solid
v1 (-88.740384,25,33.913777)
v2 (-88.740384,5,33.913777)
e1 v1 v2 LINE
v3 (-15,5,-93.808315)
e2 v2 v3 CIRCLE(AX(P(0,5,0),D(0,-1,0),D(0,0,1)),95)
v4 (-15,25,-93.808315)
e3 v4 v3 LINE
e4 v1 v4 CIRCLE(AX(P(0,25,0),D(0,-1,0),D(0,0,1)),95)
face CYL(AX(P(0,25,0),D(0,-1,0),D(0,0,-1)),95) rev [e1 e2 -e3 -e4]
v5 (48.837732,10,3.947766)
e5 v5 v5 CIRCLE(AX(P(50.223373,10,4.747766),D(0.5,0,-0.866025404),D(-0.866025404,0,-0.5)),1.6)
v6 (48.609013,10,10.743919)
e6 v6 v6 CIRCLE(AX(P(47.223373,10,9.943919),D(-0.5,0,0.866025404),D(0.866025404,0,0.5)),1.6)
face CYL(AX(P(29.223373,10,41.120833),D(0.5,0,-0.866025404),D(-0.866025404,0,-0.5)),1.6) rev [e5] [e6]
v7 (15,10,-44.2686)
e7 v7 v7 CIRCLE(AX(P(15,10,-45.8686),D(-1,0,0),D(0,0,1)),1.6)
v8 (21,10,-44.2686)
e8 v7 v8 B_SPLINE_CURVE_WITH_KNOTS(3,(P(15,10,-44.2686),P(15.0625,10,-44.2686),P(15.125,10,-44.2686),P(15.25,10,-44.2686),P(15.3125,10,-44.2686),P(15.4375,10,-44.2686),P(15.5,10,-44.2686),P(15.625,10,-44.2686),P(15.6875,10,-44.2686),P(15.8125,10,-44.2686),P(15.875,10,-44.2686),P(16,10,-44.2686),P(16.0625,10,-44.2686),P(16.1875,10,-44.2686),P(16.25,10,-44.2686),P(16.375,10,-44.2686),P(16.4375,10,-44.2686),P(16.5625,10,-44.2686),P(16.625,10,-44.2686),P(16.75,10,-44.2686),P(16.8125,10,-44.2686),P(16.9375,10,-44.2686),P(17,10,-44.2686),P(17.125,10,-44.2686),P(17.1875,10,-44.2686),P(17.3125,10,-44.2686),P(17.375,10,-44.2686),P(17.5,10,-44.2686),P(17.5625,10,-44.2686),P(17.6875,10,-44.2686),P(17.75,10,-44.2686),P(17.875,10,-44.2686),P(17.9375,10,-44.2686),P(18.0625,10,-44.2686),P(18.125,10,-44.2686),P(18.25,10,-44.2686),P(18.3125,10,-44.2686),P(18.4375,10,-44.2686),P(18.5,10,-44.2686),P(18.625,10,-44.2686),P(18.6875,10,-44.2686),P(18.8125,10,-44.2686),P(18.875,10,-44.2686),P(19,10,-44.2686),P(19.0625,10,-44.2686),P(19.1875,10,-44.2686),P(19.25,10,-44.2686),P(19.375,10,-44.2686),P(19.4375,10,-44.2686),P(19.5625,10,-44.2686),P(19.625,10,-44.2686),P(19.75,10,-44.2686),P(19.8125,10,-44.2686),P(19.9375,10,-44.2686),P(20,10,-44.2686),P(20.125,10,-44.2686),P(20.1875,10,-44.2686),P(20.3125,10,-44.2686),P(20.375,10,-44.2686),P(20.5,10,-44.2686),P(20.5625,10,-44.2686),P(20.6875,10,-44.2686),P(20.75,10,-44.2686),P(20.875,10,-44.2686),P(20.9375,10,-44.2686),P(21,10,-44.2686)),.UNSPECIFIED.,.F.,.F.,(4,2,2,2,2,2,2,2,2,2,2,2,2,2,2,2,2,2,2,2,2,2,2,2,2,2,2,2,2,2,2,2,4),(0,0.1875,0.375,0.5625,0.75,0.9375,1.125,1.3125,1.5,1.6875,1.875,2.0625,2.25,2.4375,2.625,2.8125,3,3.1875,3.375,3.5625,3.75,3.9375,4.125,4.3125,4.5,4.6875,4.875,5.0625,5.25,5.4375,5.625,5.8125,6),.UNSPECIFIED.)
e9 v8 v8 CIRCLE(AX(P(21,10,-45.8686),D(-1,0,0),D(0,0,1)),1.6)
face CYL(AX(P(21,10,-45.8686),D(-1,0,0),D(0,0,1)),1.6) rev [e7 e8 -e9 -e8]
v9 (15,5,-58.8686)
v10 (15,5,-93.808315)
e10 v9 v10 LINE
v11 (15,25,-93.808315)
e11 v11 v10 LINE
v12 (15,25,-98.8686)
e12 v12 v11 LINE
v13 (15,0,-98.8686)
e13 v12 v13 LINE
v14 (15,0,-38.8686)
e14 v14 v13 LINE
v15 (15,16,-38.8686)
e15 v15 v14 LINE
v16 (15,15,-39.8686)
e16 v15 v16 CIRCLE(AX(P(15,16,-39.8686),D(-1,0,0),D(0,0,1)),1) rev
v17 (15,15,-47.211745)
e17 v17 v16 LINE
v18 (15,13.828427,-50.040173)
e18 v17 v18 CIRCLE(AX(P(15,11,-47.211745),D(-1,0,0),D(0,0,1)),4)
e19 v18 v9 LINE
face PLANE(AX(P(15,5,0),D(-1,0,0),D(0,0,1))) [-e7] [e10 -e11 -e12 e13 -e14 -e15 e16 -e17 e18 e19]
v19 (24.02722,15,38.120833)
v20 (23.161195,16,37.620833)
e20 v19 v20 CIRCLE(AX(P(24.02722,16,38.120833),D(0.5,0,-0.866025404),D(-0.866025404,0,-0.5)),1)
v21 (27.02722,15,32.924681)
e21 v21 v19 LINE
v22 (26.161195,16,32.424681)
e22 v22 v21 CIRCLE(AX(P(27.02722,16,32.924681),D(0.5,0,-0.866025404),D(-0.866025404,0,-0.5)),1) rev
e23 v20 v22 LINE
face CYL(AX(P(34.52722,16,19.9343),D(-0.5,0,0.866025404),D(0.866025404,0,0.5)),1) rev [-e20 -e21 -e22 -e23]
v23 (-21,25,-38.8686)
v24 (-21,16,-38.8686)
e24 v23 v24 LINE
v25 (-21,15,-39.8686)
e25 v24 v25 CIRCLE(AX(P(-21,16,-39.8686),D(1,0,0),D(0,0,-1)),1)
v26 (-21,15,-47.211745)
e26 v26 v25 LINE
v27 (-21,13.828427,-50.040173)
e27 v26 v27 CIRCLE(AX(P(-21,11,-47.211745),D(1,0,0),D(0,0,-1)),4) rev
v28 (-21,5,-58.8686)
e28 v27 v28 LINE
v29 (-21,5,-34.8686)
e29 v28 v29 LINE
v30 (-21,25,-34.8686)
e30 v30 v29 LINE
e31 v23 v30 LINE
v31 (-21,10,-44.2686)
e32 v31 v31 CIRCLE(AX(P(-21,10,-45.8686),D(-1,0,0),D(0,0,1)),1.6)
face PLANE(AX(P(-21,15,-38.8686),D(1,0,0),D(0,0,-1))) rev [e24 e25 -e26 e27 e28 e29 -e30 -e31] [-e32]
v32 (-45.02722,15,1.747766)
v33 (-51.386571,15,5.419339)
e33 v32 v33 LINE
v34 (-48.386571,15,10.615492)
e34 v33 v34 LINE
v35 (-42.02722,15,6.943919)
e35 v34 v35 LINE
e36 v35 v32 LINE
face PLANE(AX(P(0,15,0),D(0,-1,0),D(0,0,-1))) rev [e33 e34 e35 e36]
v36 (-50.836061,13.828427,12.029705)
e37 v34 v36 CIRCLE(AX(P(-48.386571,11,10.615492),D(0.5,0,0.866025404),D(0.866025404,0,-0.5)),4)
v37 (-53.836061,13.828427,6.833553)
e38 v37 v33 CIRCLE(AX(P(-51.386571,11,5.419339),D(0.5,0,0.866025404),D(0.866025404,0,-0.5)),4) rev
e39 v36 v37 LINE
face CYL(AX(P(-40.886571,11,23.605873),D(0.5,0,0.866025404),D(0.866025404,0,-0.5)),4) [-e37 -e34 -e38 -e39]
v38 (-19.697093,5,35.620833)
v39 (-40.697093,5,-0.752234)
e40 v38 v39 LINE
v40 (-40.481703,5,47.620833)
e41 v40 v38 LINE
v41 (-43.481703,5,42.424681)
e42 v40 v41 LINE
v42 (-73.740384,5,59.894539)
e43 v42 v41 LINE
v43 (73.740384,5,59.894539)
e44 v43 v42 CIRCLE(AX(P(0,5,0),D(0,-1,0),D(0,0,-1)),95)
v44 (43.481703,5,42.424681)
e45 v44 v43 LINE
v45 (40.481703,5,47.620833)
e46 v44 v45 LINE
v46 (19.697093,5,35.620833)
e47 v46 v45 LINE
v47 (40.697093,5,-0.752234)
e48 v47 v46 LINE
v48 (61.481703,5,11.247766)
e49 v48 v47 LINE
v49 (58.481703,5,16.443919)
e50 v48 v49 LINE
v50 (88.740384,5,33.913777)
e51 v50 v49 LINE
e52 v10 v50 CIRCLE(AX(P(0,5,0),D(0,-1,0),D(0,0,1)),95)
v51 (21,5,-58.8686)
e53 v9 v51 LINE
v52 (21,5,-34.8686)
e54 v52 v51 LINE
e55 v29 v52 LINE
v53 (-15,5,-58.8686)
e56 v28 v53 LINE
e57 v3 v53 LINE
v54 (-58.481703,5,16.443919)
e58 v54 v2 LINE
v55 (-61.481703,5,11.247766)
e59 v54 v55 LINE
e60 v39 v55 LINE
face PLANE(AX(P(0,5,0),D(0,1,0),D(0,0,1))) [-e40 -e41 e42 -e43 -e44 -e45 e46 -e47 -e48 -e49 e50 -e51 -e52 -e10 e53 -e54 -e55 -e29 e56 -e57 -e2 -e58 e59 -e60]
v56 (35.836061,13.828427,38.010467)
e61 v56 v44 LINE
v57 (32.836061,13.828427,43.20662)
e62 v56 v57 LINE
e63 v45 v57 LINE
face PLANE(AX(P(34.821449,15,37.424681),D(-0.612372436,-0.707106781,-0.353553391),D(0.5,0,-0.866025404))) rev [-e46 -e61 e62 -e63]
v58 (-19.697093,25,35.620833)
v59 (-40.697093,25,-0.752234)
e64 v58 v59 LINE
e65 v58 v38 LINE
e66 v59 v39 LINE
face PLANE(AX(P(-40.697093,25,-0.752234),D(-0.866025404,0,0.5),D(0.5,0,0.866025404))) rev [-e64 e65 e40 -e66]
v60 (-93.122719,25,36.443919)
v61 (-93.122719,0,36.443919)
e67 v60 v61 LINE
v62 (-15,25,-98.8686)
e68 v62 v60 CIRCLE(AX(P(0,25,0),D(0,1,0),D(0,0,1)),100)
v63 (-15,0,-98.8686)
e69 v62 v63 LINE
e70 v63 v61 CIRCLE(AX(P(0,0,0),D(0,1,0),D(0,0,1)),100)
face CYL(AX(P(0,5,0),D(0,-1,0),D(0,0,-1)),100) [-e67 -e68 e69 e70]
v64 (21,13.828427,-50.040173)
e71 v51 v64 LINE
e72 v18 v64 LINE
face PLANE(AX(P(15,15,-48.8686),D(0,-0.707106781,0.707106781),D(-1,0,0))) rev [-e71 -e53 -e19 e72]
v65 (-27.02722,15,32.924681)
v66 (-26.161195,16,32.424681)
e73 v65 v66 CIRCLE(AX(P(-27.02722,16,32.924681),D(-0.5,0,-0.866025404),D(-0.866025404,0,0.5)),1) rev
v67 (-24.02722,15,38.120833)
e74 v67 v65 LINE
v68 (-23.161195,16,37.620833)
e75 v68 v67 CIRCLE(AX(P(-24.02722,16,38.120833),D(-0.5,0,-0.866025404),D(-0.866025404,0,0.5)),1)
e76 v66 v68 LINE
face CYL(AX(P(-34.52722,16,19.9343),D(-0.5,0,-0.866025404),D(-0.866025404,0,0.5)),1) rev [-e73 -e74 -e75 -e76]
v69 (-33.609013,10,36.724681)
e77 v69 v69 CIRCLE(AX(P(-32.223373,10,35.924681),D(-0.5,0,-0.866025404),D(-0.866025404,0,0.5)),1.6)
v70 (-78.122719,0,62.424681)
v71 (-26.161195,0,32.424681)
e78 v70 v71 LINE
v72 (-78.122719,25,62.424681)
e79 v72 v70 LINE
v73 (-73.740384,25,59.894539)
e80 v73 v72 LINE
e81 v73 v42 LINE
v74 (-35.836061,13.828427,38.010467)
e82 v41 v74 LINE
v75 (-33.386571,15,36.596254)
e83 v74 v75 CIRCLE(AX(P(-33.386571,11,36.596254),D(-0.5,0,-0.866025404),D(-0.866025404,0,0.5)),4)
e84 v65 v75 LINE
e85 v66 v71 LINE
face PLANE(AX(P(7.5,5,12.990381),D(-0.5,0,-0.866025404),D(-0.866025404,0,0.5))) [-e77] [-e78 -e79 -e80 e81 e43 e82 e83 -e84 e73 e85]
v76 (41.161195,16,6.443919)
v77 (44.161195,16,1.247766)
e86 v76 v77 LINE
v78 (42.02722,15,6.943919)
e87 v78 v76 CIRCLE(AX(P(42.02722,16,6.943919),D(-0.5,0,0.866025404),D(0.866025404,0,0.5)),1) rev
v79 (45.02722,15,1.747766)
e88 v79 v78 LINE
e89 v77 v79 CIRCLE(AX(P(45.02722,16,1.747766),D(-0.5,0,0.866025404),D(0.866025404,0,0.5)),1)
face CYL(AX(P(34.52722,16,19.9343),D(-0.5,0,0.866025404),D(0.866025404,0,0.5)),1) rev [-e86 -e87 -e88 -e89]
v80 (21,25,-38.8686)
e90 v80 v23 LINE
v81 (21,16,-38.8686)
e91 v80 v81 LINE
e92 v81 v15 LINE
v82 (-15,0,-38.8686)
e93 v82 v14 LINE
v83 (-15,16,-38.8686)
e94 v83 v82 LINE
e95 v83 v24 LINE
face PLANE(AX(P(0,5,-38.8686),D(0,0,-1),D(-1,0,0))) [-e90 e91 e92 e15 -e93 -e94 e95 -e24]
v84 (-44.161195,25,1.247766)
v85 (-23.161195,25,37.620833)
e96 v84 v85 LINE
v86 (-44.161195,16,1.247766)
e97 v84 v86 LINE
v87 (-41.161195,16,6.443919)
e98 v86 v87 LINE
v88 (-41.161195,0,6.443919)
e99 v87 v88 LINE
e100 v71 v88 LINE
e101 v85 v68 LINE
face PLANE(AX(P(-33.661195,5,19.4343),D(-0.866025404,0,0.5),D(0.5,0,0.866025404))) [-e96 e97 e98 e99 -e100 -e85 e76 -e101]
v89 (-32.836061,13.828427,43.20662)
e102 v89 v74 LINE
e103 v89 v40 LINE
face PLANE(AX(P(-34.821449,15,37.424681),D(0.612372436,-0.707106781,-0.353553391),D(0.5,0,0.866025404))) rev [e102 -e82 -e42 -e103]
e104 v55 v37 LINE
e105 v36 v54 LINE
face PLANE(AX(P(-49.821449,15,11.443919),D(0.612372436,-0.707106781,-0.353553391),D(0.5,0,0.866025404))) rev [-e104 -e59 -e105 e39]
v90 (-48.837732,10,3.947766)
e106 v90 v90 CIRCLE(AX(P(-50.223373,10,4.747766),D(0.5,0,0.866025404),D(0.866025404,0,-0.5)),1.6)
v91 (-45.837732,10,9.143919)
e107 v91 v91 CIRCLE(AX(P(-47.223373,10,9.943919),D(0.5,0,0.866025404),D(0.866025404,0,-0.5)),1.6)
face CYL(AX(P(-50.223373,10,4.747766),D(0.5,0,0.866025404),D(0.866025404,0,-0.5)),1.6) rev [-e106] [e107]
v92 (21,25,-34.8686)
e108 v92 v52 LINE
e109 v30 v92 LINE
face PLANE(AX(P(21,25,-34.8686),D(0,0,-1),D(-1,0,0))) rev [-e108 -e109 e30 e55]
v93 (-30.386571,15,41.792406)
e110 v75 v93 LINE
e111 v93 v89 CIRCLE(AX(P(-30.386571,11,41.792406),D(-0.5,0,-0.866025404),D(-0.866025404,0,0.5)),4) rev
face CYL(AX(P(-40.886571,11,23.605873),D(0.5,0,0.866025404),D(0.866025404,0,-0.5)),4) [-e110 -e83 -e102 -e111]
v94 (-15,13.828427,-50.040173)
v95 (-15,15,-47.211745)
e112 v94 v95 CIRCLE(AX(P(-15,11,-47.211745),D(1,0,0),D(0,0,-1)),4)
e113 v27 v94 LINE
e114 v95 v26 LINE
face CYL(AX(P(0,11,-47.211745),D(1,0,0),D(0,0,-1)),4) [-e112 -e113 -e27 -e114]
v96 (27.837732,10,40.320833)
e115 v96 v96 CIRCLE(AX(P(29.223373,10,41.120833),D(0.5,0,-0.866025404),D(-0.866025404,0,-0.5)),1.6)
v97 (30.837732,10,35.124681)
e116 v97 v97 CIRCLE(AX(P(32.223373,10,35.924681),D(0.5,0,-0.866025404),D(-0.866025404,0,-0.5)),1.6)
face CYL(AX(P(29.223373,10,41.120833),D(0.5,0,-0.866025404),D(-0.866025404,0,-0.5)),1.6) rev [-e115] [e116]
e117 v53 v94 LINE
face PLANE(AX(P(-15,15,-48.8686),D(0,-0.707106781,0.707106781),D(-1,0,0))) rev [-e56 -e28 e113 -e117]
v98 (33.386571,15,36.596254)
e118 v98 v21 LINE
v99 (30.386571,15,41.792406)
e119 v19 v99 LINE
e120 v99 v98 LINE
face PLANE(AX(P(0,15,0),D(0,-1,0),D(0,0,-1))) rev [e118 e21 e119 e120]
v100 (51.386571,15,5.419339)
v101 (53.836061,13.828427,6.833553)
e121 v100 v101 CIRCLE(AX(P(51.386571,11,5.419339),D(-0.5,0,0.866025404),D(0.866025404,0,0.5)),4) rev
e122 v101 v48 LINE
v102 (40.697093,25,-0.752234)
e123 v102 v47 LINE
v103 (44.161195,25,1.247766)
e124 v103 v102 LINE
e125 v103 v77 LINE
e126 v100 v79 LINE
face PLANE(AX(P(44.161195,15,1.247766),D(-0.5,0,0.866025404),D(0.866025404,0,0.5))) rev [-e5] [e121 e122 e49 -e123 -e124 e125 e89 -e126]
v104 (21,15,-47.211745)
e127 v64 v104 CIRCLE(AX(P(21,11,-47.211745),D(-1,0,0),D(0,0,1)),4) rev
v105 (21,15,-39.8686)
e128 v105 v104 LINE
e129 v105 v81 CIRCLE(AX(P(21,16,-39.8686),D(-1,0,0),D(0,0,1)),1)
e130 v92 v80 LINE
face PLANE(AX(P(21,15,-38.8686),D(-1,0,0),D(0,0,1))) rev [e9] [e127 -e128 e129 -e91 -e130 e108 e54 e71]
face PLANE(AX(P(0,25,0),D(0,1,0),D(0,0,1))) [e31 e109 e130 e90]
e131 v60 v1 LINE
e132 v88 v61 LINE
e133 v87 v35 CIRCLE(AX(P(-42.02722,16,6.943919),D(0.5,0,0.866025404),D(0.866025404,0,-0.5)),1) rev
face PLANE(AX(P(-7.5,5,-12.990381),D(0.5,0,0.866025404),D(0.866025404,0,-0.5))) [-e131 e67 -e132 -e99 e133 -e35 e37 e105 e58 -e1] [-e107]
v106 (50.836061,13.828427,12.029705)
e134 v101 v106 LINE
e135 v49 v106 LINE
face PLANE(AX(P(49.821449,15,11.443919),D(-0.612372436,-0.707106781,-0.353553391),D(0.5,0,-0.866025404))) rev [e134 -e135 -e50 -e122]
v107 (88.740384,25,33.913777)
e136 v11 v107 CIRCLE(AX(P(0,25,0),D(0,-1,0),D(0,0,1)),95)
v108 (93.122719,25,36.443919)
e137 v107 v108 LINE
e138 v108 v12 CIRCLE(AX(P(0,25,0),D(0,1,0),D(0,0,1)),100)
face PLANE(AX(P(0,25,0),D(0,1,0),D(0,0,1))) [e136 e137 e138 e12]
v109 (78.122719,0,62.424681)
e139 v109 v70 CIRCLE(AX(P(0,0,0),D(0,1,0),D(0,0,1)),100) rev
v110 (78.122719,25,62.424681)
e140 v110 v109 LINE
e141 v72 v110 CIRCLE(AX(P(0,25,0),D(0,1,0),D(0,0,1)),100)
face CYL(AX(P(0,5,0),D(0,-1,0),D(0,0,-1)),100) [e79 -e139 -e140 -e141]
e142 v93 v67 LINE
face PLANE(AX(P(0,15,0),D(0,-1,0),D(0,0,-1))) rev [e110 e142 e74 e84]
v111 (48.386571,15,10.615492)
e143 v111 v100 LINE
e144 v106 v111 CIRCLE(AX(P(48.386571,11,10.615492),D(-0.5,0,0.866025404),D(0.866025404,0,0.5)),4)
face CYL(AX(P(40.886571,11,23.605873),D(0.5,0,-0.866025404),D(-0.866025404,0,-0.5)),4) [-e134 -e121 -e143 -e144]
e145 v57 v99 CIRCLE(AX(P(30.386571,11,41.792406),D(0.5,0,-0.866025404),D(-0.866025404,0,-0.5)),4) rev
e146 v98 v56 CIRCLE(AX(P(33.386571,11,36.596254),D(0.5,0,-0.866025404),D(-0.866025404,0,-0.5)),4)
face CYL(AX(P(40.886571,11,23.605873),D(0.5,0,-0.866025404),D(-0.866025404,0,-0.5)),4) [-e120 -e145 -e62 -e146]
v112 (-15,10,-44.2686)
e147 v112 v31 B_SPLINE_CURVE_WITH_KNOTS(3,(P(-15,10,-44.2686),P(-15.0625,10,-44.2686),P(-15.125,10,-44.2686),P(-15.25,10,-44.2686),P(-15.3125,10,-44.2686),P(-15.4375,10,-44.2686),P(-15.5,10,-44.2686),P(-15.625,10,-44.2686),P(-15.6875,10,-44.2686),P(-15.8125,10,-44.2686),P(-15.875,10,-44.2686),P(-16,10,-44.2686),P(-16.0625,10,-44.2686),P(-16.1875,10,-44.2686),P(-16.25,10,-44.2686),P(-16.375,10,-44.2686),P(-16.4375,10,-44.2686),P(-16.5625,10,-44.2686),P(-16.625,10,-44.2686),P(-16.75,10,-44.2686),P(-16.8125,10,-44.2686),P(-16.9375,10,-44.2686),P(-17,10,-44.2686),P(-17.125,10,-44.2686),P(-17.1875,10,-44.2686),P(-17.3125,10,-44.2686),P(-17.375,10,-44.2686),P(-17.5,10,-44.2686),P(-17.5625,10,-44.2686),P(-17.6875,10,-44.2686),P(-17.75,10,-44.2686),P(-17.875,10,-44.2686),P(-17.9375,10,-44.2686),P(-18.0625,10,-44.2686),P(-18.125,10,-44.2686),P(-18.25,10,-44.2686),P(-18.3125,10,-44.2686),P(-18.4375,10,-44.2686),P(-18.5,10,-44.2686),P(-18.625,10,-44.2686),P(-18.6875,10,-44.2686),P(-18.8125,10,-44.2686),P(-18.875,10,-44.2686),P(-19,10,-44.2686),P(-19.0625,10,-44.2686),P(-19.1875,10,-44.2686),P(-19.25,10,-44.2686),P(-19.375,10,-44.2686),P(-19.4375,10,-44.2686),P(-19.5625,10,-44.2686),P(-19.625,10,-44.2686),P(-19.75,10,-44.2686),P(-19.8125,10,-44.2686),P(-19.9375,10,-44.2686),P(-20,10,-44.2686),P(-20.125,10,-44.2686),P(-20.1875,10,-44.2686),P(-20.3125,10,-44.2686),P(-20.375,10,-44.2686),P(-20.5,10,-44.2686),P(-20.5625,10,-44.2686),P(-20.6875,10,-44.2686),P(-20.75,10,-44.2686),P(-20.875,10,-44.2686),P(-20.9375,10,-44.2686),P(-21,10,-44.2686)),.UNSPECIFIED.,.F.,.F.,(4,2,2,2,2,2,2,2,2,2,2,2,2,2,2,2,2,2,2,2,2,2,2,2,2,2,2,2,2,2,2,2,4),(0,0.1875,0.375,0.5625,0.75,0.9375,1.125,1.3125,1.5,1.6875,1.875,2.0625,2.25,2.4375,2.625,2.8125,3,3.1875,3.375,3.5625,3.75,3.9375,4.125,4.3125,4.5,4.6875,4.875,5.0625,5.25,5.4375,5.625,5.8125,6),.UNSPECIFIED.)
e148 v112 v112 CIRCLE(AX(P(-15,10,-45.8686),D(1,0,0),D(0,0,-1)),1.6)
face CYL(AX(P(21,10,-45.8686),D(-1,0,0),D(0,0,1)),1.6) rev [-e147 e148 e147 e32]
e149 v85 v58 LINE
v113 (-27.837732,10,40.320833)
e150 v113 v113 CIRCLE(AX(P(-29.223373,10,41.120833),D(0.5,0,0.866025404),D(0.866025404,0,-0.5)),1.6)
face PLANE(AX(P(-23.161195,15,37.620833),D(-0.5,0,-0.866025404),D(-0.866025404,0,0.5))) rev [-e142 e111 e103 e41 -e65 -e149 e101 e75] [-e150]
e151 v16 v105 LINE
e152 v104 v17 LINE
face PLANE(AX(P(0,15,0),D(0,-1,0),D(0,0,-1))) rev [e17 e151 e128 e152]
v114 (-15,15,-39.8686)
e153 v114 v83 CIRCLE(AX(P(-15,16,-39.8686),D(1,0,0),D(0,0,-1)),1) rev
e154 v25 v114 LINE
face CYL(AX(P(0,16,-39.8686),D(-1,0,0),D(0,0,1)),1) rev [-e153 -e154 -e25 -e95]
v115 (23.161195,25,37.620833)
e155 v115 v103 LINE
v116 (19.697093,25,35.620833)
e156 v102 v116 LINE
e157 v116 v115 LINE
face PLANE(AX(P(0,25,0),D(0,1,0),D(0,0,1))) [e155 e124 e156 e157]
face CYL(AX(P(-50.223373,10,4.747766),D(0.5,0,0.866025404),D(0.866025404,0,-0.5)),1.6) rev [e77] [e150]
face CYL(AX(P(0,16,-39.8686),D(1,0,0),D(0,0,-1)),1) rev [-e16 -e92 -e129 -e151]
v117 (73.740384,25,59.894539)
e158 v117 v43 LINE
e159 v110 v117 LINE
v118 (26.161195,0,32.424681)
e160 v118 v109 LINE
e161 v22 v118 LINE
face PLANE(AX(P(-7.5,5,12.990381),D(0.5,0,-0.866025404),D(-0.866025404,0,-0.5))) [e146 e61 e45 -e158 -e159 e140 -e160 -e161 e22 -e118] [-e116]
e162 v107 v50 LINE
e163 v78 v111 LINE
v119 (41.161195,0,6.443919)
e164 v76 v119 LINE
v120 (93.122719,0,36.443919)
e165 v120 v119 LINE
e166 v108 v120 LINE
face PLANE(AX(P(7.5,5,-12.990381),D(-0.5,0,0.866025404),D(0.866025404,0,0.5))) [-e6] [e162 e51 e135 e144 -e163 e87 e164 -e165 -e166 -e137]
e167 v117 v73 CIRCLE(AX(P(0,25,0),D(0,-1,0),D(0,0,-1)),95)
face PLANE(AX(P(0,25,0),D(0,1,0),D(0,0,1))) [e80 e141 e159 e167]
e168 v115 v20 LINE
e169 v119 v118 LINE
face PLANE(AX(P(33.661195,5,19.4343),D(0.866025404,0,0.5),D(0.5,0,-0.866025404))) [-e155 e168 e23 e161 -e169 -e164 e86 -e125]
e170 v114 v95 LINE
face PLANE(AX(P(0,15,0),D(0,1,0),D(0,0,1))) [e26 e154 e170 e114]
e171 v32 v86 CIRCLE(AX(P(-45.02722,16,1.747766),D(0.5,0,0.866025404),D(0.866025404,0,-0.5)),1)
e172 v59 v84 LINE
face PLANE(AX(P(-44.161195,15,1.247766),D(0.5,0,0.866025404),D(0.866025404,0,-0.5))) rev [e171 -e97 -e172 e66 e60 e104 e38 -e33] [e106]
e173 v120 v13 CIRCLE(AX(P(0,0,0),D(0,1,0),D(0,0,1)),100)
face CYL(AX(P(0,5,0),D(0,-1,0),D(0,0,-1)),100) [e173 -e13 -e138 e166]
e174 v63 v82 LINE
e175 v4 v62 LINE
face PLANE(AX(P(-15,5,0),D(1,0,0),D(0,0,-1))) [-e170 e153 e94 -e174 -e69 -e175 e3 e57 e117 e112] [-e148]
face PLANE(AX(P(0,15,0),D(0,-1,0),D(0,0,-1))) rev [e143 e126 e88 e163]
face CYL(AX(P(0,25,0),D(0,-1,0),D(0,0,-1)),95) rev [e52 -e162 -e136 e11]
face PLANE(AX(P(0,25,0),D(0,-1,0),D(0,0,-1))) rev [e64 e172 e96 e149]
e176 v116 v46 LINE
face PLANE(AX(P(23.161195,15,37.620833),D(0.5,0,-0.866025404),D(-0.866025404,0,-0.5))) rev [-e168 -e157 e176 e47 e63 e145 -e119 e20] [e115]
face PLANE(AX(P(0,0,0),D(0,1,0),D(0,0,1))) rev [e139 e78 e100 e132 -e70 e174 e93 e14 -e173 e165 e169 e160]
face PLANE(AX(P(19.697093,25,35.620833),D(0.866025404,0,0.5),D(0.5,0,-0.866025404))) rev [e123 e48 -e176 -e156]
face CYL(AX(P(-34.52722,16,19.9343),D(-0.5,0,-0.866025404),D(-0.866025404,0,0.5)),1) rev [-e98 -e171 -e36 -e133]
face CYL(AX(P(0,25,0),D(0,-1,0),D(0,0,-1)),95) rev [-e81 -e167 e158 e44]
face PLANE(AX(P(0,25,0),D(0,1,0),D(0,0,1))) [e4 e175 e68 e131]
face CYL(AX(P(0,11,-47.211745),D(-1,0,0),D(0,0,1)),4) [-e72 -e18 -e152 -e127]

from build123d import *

# Parameters (mm, degrees)
AUFSATZ_LINEAR_AUSTRAGEN1_DEPTH = 5
SKIZZE2_W                       = 6
SKIZZE2_H                       = 10
AUFSATZ_LINEAR_AUSTRAGEN2_DEPTH = 10
FASE1_SIZE                      = 10
SKIZZE3_R                       = 1.6
SCHNITT_LINEAR_AUSTRAGEN1_DEPTH = 42
SKIZZE4_W                       = 42
SKIZZE4_H                       = 4
AUFSATZ_LINEAR_AUSTRAGEN3_DEPTH = 20
KREISMUSTER1_COUNT              = 3
VERRUNDUNG1_START               = -21
VERRUNDUNG1_DEPTH               = 6
VERRUNDUNG1_START_2             = 15
VERRUNDUNG1_2_DEPTH             = 6
VERRUNDUNG1_3_DEPTH             = 6
VERRUNDUNG1_4_DEPTH             = 6
VERRUNDUNG1_5_DEPTH             = 6
VERRUNDUNG1_6_DEPTH             = 6
VERRUNDUNG1_START_3             = -22
VERRUNDUNG1_7_DEPTH             = 44
VERRUNDUNG1_8_DEPTH             = 44
VERRUNDUNG1_9_DEPTH             = 44


with BuildPart() as part:
    # Skizze1 → Aufsatz-Linear austragen1 (new body)
    with BuildSketch(Plane(origin=(0, 0, 0), x_dir=(1, 0, 0), z_dir=(0, 1, 0))):
        with BuildLine():
            Line((93.122718948, -36.443918776), (41.161194721, -6.443918776))
            Line((41.161194721, -6.443918776), (26.161194721, -32.42468089))
            Line((26.161194721, -32.42468089), (78.122718948, -62.42468089))
            ThreePointArc((78.122718948, -62.42468089), (0, -100), (-78.122718948, -62.42468089))
            Line((-78.122718948, -62.42468089), (-26.161194721, -32.42468089))
            Line((-26.161194721, -32.42468089), (-41.161194721, -6.443918776))
            Line((-41.161194721, -6.443918776), (-93.122718948, -36.443918776))
            ThreePointArc((-93.122718948, -36.443918776), (-86.602540378, 50), (-15, 98.868599666))
            Line((-15, 98.868599666), (-15, 38.868599666))
            Line((-15, 38.868599666), (15, 38.868599666))
            Line((15, 38.868599666), (15, 98.868599666))
            ThreePointArc((15, 98.868599666), (86.602540378, 50), (93.122718948, -36.443918776))
        make_face()
    extrude(amount=AUFSATZ_LINEAR_AUSTRAGEN1_DEPTH)

    # Skizze2 → Aufsatz-Linear austragen2 (add)
    with BuildSketch(Plane(origin=(0, 5, 0), x_dir=(1, 0, 0), z_dir=(0, 1, 0))):
        Polygon((49.821448758, -11.443918776), (52.821448758, -6.247766354), (44.161194721, -1.247766354), (41.161194721, -6.443918776), align=None)
        with Locations((-18, 43.868599666)):
            Rectangle(SKIZZE2_W, SKIZZE2_H)
        with Locations((18, 43.868599666)):
            Rectangle(SKIZZE2_W, SKIZZE2_H)
        Polygon((26.161194721, -32.42468089), (23.161194721, -37.620833313), (31.821448758, -42.620833313), (34.821448758, -37.42468089), align=None)
        Polygon((-34.821448758, -37.42468089), (-31.821448758, -42.620833313), (-23.161194721, -37.620833313), (-26.161194721, -32.42468089), align=None)
        Polygon((-41.161194721, -6.443918776), (-44.161194721, -1.247766354), (-52.821448758, -6.247766354), (-49.821448758, -11.443918776), align=None)
    extrude(amount=AUFSATZ_LINEAR_AUSTRAGEN2_DEPTH)

    # Fase1
    fase1_edges = [part.edges().sort_by_distance(p)[0] for p in [
        (-18, 5, -48.868599666),
        (18, 5, -48.868599666),
        (51.321448758, 5, 8.845842565),
        (33.321448758, 5, 40.022757101),
        (-33.321448758, 5, 40.022757101),
        (-51.321448758, 5, 8.845842565),
    ]]
    chamfer(fase1_edges, length=FASE1_SIZE - 0.0001)  # a hair under: the kernel refuses the full size

    # Skizze3 → Schnitt-Linear austragen1 (cut)
    with BuildSketch(Plane(origin=(10.5, 0, 18.186533479), x_dir=(0.8660254037844384, 0, -0.5000000000000007), z_dir=(0.5000000000000006, 0, 0.8660254037844383))):
        with Locations((-45.868599666, 10)):
            Circle(SKIZZE3_R)
    schnitt_linear_austragen1 = extrude(amount=-SCHNITT_LINEAR_AUSTRAGEN1_DEPTH, mode=Mode.SUBTRACT)

    # Skizze4 → Aufsatz-Linear austragen3 (add)
    with BuildSketch(Plane(origin=(0, 5, 0), x_dir=(1, 0, 0), z_dir=(0, 1, 0))):
        with BuildLine():
            Line((-93.122718948, -36.443918776), (-88.740384046, -33.913776541))
            ThreePointArc((-88.740384046, -33.913776541), (-82.27241336, 47.5), (-15, 93.808315196))
            Line((-15, 93.808315196), (-15, 98.868599666))
            ThreePointArc((-15, 98.868599666), (-86.602540378, 50), (-93.122718948, -36.443918776))
        make_face()
        with BuildLine():
            Line((-78.122718948, -62.42468089), (-73.740384046, -59.894538655))
            ThreePointArc((-73.740384046, -59.894538655), (0, -95), (73.740384046, -59.894538655))
            Line((73.740384046, -59.894538655), (78.122718948, -62.42468089))
            ThreePointArc((78.122718948, -62.42468089), (0, -100), (-78.122718948, -62.42468089))
        make_face()
        with BuildLine():
            Line((93.122718948, -36.443918776), (88.740384046, -33.913776541))
            ThreePointArc((88.740384046, -33.913776541), (82.27241336, 47.5), (15, 93.808315196))
            Line((15, 93.808315196), (15, 98.868599666))
            ThreePointArc((15, 98.868599666), (86.602540378, 50), (93.122718948, -36.443918776))
        make_face()
        Polygon((-44.161194721, -1.247766354), (-23.161194721, -37.620833313), (-19.697093106, -35.620833313), (-40.697093106, 0.752233646), align=None)
        with Locations((0, 36.868599666)):
            Rectangle(SKIZZE4_W, SKIZZE4_H)
        Polygon((19.697093106, -35.620833313), (40.697093106, 0.752233646), (44.161194721, -1.247766354), (23.161194721, -37.620833313), align=None)
    extrude(amount=AUFSATZ_LINEAR_AUSTRAGEN3_DEPTH)

    # Kreismuster1: Schnitt-Linear austragen1 ×3 about axis
    kreismuster1_axis = Axis((0, 5, 0), (0, -1, 0))
    for i in range(1, KREISMUSTER1_COUNT):
        add(schnitt_linear_austragen1.rotate(kreismuster1_axis, i * 360 / KREISMUSTER1_COUNT), mode=Mode.SUBTRACT)

    # Verrundung1: read off the stored shape, not the designer's step
    # Verrundung1 outline → Verrundung1 (add)
    with BuildSketch(Plane.YZ.offset(VERRUNDUNG1_START)):
        with BuildLine():
            ThreePointArc((15, -39.868599666), (15.292893219, -39.161492885), (16, -38.868599666))
            Line((16, -38.868599666), (15, -38.868599666))
            Line((15, -38.868599666), (15, -39.868599666))
        make_face()
    extrude(amount=VERRUNDUNG1_DEPTH)

    # Verrundung1 2 outline → Verrundung1 2 (add)
    with BuildSketch(Plane.YZ.offset(VERRUNDUNG1_START_2)):
        with BuildLine():
            ThreePointArc((15, -39.868599666), (15.292893219, -39.161492885), (16, -38.868599666))
            Line((16, -38.868599666), (15, -38.868599666))
            Line((15, -38.868599666), (15, -39.868599666))
        make_face()
    extrude(amount=VERRUNDUNG1_2_DEPTH)

    # Verrundung1 3 outline → Verrundung1 3 (add)
    with BuildSketch(Plane(origin=(0, 0, 0), x_dir=(0.8660254037844386, 0, 0.4999999999999999), z_dir=(0.4999999999999999, 0, -0.8660254037844388)).offset(VERRUNDUNG1_START)):
        with BuildLine():
            Line((38.868599666, -15), (38.868599666, -16))
            ThreePointArc((38.868599666, -16), (39.161492885, -15.292893219), (39.868599666, -15))
            Line((39.868599666, -15), (38.868599666, -15))
        make_face()
    extrude(amount=VERRUNDUNG1_3_DEPTH)

    # Verrundung1 4 outline → Verrundung1 4 (add)
    with BuildSketch(Plane(origin=(0, 0, 0), x_dir=(0.8660254037844386, 0, 0.4999999999999999), z_dir=(0.4999999999999999, 0, -0.8660254037844388)).offset(VERRUNDUNG1_START_2)):
        with BuildLine():
            Line((38.868599666, -15), (38.868599666, -16))
            ThreePointArc((38.868599666, -16), (39.161492885, -15.292893219), (39.868599666, -15))
            Line((39.868599666, -15), (38.868599666, -15))
        make_face()
    extrude(amount=VERRUNDUNG1_4_DEPTH)

    # Verrundung1 5 outline → Verrundung1 5 (add)
    with BuildSketch(Plane(origin=(0, 0, 0), x_dir=(0.8660254037844384, 0, -0.5000000000000003), z_dir=(0.5000000000000003, 0, 0.8660254037844385)).offset(VERRUNDUNG1_START)):
        with BuildLine():
            Line((-38.868599666, 15), (-38.868599666, 16))
            ThreePointArc((-38.868599666, 16), (-39.161492885, 15.292893219), (-39.868599666, 15))
            Line((-39.868599666, 15), (-38.868599666, 15))
        make_face()
    extrude(amount=VERRUNDUNG1_5_DEPTH)

    # Verrundung1 6 outline → Verrundung1 6 (add)
    with BuildSketch(Plane(origin=(0, 0, 0), x_dir=(0.8660254037844384, 0, -0.5000000000000003), z_dir=(0.5000000000000003, 0, 0.8660254037844385)).offset(VERRUNDUNG1_START_2)):
        with BuildLine():
            Line((-38.868599666, 15), (-38.868599666, 16))
            ThreePointArc((-38.868599666, 16), (-39.161492885, 15.292893219), (-39.868599666, 15))
            Line((-39.868599666, 15), (-38.868599666, 15))
        make_face()
    extrude(amount=VERRUNDUNG1_6_DEPTH)

    # Verrundung1 7 outline → Verrundung1 7 (cut)
    with BuildSketch(Plane.YZ.offset(VERRUNDUNG1_START_3)):
        with BuildLine():
            Line((15, -48.868599666), (15, -47.211745417))
            ThreePointArc((15, -47.211745417), (14.69551813, -48.742479146), (13.828427125, -50.040172542))
            Line((13.828427125, -50.040172542), (15, -48.868599666))
        make_face()
    extrude(amount=VERRUNDUNG1_7_DEPTH, mode=Mode.SUBTRACT)

    # Verrundung1 8 outline → Verrundung1 8 (cut)
    with BuildSketch(Plane(origin=(0, 0, 0), x_dir=(0.8660254037844386, 0, 0.4999999999999999), z_dir=(0.4999999999999999, 0, -0.8660254037844388)).offset(VERRUNDUNG1_START_3)):
        with BuildLine():
            ThreePointArc((50.040172542, -13.828427125), (48.742479146, -14.69551813), (47.211745417, -15))
            Line((47.211745417, -15), (48.868599666, -15))
            Line((48.868599666, -15), (50.040172542, -13.828427125))
        make_face()
    extrude(amount=VERRUNDUNG1_8_DEPTH, mode=Mode.SUBTRACT)

    # Verrundung1 9 outline → Verrundung1 9 (cut)
    with BuildSketch(Plane(origin=(0, 0, 0), x_dir=(0.8660254037844384, 0, -0.5000000000000003), z_dir=(0.5000000000000003, 0, 0.8660254037844385)).offset(VERRUNDUNG1_START_3)):
        with BuildLine():
            ThreePointArc((-50.040172542, 13.828427125), (-48.742479146, 14.69551813), (-47.211745417, 15))
            Line((-47.211745417, 15), (-48.868599666, 15))
            Line((-48.868599666, 15), (-50.040172542, 13.828427125))
        make_face()
    extrude(amount=VERRUNDUNG1_9_DEPTH, mode=Mode.SUBTRACT)


solid = part.part
